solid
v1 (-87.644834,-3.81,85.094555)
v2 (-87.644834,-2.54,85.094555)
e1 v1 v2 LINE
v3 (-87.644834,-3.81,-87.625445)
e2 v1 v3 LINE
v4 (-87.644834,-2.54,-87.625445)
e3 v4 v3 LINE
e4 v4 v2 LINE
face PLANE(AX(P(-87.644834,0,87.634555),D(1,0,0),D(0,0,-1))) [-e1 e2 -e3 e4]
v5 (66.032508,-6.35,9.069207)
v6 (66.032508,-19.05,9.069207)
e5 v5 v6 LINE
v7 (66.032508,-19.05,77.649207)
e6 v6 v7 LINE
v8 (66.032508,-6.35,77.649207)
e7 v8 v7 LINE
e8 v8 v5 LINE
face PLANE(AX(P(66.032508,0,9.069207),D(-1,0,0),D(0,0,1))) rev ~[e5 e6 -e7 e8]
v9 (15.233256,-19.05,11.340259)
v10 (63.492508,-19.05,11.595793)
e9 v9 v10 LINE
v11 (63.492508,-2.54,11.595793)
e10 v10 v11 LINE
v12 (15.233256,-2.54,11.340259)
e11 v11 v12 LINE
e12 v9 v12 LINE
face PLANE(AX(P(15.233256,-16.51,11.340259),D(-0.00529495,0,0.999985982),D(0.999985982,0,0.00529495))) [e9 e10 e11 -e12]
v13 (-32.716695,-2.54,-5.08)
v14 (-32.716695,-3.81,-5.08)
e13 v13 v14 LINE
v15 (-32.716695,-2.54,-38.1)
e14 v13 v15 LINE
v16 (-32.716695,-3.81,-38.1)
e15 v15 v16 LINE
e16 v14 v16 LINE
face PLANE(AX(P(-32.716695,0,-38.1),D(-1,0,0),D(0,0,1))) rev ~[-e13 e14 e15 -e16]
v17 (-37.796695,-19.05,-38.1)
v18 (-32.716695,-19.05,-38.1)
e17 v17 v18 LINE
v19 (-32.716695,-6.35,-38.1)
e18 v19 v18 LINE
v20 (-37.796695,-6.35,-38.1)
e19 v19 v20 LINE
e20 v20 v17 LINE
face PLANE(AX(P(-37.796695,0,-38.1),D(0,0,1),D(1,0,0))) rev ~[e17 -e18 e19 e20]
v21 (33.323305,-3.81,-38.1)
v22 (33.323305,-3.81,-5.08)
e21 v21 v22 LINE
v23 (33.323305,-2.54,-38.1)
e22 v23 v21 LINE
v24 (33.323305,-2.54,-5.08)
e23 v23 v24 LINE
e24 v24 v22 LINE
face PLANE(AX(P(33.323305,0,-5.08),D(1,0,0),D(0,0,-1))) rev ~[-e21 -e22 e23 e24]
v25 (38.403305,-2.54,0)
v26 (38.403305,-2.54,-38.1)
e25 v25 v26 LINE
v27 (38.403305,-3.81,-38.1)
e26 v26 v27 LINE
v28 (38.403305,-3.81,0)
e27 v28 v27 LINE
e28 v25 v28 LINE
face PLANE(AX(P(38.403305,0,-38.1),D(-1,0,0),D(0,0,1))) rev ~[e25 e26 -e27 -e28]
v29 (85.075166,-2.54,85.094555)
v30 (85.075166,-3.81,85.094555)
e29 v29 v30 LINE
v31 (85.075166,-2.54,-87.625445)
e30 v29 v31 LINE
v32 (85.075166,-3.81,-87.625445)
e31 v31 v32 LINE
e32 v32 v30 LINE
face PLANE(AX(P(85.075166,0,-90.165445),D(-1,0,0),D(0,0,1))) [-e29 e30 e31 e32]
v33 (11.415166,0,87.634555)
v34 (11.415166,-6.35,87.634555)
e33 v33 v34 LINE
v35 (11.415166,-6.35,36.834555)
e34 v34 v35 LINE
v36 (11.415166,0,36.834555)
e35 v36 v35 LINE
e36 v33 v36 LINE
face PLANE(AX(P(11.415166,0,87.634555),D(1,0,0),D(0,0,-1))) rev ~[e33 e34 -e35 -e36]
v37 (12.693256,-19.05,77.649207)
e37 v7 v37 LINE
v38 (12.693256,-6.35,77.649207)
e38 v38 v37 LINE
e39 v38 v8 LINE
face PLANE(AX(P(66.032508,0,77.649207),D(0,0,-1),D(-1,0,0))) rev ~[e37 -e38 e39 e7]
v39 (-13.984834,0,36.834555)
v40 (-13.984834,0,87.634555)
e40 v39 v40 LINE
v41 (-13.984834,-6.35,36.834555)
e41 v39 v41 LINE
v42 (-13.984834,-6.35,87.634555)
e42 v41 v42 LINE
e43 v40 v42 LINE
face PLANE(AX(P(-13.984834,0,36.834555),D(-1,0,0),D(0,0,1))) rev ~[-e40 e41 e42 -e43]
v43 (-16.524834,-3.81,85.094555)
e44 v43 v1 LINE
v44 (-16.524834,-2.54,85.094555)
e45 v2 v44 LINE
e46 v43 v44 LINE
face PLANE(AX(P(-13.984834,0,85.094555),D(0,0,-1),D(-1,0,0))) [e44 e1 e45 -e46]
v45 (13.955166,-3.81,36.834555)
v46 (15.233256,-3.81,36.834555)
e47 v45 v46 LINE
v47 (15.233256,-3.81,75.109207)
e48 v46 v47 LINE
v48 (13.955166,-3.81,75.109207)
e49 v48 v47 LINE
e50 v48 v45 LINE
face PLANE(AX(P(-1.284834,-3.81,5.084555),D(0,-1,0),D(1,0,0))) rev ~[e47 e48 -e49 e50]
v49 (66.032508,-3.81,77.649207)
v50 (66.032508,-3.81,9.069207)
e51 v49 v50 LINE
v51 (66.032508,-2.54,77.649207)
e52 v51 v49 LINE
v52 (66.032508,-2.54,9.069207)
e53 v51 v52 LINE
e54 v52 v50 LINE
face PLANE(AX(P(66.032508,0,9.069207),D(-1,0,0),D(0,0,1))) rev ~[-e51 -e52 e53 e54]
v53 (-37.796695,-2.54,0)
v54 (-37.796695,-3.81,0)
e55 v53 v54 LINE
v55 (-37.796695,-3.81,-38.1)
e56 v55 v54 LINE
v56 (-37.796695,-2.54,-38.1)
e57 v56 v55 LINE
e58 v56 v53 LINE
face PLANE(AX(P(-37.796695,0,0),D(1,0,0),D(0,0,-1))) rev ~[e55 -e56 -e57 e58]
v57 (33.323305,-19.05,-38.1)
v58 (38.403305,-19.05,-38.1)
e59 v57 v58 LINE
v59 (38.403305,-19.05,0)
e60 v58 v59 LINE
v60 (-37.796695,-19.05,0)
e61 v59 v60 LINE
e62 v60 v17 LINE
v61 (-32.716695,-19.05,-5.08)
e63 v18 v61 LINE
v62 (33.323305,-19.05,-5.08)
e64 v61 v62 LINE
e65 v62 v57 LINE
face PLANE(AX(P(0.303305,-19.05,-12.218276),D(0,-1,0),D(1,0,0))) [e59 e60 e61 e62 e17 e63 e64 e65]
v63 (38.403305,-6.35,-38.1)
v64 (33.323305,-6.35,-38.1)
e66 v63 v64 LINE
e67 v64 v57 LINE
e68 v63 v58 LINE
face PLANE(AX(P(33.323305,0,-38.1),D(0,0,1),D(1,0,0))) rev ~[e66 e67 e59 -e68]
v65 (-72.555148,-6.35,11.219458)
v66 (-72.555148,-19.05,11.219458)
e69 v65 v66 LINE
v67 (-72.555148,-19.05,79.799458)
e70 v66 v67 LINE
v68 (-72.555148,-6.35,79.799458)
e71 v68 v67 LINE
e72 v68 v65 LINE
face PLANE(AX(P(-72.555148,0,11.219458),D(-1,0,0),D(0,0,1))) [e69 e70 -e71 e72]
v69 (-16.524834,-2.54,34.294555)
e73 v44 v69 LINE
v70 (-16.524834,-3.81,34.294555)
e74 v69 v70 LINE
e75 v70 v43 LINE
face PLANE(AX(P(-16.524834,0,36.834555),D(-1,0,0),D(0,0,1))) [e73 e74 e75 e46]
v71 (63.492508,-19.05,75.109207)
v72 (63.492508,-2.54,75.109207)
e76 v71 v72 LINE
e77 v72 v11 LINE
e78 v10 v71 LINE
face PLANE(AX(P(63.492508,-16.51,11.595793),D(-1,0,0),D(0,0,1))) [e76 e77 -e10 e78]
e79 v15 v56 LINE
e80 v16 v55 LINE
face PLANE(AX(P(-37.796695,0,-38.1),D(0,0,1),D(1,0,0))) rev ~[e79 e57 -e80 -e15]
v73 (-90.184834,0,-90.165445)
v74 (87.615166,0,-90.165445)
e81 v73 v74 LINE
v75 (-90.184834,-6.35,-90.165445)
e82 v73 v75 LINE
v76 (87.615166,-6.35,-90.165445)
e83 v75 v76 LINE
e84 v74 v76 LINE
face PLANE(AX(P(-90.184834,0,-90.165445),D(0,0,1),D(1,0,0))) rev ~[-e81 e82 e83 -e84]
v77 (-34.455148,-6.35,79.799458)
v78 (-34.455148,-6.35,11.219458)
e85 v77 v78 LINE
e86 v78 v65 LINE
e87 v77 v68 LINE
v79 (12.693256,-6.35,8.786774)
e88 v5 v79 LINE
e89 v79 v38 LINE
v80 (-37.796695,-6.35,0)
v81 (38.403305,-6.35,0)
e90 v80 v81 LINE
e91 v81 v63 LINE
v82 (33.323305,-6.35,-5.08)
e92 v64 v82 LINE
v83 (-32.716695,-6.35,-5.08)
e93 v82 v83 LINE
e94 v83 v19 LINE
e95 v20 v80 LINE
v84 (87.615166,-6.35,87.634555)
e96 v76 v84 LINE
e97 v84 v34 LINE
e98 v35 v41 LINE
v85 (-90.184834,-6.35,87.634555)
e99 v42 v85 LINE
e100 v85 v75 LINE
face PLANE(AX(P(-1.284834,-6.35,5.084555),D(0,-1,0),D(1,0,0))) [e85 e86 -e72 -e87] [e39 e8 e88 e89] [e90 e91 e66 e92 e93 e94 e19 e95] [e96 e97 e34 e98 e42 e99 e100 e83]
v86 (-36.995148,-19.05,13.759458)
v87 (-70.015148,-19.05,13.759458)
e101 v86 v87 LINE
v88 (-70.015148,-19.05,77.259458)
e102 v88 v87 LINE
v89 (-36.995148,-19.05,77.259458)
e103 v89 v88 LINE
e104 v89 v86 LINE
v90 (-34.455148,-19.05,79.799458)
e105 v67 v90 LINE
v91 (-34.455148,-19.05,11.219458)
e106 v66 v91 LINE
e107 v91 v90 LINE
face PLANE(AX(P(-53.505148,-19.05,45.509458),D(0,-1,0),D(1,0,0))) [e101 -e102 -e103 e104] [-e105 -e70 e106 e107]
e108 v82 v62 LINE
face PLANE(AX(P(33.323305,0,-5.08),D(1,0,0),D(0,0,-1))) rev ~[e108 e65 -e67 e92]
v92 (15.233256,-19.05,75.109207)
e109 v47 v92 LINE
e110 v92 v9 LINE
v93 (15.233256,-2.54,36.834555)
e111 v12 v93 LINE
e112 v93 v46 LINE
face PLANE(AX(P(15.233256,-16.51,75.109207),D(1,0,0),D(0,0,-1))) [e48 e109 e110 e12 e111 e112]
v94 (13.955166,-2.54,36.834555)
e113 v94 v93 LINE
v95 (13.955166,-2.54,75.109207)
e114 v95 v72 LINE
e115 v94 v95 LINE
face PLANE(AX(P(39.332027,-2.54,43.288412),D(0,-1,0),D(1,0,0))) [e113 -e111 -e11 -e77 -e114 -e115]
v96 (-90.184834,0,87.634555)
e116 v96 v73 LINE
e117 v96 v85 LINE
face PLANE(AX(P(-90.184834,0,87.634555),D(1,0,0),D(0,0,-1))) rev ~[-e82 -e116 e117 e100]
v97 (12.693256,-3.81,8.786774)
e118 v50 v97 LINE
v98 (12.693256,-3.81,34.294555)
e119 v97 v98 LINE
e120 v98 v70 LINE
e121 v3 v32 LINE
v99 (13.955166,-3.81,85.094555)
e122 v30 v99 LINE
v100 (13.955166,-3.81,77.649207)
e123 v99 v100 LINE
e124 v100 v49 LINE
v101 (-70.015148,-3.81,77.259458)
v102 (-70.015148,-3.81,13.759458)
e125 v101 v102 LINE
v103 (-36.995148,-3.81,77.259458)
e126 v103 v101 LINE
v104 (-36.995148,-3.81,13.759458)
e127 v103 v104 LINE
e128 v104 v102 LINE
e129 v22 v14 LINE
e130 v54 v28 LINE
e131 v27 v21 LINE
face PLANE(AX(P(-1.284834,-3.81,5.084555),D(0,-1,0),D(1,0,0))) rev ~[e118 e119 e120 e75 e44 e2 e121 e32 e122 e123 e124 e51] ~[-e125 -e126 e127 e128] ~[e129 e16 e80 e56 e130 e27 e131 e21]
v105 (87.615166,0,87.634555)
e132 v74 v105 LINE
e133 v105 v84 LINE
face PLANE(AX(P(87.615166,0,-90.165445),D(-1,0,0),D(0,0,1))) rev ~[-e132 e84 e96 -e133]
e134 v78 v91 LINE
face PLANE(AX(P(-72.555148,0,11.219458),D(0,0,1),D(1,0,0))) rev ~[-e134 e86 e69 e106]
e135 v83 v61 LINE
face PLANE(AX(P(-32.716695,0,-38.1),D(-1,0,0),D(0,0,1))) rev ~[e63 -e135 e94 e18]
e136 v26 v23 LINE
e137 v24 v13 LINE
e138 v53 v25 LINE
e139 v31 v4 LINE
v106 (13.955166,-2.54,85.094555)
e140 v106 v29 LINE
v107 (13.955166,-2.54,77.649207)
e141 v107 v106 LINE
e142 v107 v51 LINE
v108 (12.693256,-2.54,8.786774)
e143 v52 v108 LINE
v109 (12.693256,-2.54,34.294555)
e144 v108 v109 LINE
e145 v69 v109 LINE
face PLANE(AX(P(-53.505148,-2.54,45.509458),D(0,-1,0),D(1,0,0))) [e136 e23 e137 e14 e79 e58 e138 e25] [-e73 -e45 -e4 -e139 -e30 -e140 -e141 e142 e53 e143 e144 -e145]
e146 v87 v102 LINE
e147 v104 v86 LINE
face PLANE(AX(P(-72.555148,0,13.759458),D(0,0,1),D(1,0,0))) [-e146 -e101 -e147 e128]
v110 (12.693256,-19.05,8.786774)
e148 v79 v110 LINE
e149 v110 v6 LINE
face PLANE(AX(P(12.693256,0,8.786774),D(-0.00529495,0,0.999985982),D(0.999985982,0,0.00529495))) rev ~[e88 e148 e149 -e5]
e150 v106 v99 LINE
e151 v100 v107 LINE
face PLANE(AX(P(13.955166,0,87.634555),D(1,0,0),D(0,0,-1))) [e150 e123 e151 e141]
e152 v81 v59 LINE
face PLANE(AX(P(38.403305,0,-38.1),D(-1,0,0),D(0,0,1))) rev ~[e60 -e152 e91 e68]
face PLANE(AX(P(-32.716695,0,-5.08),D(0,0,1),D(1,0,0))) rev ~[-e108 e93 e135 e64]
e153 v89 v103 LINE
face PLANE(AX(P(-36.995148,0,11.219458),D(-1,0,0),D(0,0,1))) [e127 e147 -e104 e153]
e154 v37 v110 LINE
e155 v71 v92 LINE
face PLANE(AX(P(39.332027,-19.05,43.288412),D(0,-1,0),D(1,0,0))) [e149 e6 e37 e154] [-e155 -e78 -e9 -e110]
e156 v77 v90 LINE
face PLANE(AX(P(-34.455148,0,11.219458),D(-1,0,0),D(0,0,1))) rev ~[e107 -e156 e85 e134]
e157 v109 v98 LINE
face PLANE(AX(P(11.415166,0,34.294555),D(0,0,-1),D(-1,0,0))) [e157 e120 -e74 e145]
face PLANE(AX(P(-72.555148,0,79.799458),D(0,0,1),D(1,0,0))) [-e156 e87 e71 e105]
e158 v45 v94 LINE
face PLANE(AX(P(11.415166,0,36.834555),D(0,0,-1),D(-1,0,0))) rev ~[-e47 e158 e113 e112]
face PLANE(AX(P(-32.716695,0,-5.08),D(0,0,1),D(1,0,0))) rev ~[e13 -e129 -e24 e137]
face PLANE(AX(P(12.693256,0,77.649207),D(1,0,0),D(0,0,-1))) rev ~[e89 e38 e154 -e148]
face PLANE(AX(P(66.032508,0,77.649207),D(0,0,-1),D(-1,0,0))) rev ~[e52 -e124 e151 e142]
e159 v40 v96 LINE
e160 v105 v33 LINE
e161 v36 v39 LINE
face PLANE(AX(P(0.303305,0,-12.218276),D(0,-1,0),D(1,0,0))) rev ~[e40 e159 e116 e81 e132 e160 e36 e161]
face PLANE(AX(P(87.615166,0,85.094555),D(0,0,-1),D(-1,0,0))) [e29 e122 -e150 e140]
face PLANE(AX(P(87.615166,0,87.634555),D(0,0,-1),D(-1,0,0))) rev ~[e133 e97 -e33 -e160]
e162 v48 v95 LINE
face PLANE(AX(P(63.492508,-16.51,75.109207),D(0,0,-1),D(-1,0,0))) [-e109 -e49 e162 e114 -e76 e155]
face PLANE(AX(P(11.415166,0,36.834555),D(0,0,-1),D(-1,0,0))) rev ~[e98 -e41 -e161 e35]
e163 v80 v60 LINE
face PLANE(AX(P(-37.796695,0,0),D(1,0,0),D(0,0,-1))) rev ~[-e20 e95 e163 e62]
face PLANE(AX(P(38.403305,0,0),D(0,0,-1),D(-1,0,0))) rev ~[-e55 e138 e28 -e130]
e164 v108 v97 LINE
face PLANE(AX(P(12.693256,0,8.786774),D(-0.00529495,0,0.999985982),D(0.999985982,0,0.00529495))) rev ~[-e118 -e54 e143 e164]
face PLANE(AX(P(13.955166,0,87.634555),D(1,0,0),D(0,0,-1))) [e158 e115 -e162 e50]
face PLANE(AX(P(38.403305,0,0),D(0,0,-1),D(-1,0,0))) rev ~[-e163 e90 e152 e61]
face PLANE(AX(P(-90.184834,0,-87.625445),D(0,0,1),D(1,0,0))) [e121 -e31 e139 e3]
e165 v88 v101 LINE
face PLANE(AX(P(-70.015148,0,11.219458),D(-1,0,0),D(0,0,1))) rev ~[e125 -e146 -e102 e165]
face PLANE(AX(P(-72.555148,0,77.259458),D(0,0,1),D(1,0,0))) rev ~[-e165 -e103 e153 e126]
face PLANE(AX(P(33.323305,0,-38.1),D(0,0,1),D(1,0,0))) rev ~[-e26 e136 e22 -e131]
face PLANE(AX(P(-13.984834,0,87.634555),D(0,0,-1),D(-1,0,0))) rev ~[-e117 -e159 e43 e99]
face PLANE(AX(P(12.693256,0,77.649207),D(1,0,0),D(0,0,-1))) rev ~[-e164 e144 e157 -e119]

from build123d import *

# Parameters (mm, degrees)
F1_DEPTH = 6.35
F2_W     = 38.1
F2_H     = 68.58
F3_DEPTH = 19.05
F4_T     = -2.54
F6_DEPTH = 19.05
F7_T     = -2.54
F9_DEPTH = 19.05


# Not quite as in the source:
# - a shell that OpenCascade refuses in one call is made with other operations: the cavity is built on its own and cut out


with BuildPart() as f1:
    # F0 (on Front) → F1 (new body)
    with BuildSketch(Plane.XZ):
        Polygon((-90.1848339975, 87.6345549519), (-90.1848339975, -90.1654450481), (87.6151660025, -90.1654450481), (87.6151660025, 87.6345549519), (11.4151660025, 87.6345549519), (11.4151660025, 36.8345549519), (-13.9848339975, 36.8345549519), (-13.9848339975, 87.6345549519), align=None)
    extrude(amount=F1_DEPTH)

    # F2 (on Front) → F3 (join)
    with BuildSketch(Plane.XZ):
        with Locations((-53.5051479423, 45.5094583845)):
            Rectangle(F2_W, F2_H)
    extrude(amount=F3_DEPTH)

    # F4
    f4_openings = [f1.faces().sort_by_distance(p)[0] for p in [
        (-53.505148, -19.05, 45.509458),
    ]]
    offset(amount=F4_T, openings=f4_openings, kind=Kind.INTERSECTION)

    # F5 (on Front) → F6 (join)
    with BuildSketch(Plane.XZ):
        Polygon((12.6932561398, 77.6492066986), (12.6932561398, 8.7867740487), (66.0325084011, 9.0692066986), (66.0325084011, 77.6492066986), align=None)
    extrude(amount=F6_DEPTH)

    # F7: a shell. OpenCascade refuses it in one call, so the cavity is built on its own and cut out:
    # the body offset inwards by the wall thickness, plus a prism from it out through each open face.
    f7_core = offset(f1.part, amount=F7_T, kind=Kind.INTERSECTION, mode=Mode.PRIVATE)
    f7_exits = [f7_core.faces().sort_by_distance(p)[0] for p in [
        (39.346735, -16.51, 43.288574),
    ]]
    add(f7_core, mode=Mode.SUBTRACT)
    extrude(f7_exits, amount=-F7_T, mode=Mode.SUBTRACT)

    # F8 (on Front) → F9 (join)
    with BuildSketch(Plane.XZ):
        Polygon((38.4033048588, 0), (-37.7966951412, 0), (-37.7966951412, -38.1), (-32.7166951412, -38.1), (-32.7166951412, -5.08), (33.3233048588, -5.08), (33.3233048588, -38.1), (38.4033048588, -38.1), align=None)
    extrude(amount=F9_DEPTH)


solid = f1.part
